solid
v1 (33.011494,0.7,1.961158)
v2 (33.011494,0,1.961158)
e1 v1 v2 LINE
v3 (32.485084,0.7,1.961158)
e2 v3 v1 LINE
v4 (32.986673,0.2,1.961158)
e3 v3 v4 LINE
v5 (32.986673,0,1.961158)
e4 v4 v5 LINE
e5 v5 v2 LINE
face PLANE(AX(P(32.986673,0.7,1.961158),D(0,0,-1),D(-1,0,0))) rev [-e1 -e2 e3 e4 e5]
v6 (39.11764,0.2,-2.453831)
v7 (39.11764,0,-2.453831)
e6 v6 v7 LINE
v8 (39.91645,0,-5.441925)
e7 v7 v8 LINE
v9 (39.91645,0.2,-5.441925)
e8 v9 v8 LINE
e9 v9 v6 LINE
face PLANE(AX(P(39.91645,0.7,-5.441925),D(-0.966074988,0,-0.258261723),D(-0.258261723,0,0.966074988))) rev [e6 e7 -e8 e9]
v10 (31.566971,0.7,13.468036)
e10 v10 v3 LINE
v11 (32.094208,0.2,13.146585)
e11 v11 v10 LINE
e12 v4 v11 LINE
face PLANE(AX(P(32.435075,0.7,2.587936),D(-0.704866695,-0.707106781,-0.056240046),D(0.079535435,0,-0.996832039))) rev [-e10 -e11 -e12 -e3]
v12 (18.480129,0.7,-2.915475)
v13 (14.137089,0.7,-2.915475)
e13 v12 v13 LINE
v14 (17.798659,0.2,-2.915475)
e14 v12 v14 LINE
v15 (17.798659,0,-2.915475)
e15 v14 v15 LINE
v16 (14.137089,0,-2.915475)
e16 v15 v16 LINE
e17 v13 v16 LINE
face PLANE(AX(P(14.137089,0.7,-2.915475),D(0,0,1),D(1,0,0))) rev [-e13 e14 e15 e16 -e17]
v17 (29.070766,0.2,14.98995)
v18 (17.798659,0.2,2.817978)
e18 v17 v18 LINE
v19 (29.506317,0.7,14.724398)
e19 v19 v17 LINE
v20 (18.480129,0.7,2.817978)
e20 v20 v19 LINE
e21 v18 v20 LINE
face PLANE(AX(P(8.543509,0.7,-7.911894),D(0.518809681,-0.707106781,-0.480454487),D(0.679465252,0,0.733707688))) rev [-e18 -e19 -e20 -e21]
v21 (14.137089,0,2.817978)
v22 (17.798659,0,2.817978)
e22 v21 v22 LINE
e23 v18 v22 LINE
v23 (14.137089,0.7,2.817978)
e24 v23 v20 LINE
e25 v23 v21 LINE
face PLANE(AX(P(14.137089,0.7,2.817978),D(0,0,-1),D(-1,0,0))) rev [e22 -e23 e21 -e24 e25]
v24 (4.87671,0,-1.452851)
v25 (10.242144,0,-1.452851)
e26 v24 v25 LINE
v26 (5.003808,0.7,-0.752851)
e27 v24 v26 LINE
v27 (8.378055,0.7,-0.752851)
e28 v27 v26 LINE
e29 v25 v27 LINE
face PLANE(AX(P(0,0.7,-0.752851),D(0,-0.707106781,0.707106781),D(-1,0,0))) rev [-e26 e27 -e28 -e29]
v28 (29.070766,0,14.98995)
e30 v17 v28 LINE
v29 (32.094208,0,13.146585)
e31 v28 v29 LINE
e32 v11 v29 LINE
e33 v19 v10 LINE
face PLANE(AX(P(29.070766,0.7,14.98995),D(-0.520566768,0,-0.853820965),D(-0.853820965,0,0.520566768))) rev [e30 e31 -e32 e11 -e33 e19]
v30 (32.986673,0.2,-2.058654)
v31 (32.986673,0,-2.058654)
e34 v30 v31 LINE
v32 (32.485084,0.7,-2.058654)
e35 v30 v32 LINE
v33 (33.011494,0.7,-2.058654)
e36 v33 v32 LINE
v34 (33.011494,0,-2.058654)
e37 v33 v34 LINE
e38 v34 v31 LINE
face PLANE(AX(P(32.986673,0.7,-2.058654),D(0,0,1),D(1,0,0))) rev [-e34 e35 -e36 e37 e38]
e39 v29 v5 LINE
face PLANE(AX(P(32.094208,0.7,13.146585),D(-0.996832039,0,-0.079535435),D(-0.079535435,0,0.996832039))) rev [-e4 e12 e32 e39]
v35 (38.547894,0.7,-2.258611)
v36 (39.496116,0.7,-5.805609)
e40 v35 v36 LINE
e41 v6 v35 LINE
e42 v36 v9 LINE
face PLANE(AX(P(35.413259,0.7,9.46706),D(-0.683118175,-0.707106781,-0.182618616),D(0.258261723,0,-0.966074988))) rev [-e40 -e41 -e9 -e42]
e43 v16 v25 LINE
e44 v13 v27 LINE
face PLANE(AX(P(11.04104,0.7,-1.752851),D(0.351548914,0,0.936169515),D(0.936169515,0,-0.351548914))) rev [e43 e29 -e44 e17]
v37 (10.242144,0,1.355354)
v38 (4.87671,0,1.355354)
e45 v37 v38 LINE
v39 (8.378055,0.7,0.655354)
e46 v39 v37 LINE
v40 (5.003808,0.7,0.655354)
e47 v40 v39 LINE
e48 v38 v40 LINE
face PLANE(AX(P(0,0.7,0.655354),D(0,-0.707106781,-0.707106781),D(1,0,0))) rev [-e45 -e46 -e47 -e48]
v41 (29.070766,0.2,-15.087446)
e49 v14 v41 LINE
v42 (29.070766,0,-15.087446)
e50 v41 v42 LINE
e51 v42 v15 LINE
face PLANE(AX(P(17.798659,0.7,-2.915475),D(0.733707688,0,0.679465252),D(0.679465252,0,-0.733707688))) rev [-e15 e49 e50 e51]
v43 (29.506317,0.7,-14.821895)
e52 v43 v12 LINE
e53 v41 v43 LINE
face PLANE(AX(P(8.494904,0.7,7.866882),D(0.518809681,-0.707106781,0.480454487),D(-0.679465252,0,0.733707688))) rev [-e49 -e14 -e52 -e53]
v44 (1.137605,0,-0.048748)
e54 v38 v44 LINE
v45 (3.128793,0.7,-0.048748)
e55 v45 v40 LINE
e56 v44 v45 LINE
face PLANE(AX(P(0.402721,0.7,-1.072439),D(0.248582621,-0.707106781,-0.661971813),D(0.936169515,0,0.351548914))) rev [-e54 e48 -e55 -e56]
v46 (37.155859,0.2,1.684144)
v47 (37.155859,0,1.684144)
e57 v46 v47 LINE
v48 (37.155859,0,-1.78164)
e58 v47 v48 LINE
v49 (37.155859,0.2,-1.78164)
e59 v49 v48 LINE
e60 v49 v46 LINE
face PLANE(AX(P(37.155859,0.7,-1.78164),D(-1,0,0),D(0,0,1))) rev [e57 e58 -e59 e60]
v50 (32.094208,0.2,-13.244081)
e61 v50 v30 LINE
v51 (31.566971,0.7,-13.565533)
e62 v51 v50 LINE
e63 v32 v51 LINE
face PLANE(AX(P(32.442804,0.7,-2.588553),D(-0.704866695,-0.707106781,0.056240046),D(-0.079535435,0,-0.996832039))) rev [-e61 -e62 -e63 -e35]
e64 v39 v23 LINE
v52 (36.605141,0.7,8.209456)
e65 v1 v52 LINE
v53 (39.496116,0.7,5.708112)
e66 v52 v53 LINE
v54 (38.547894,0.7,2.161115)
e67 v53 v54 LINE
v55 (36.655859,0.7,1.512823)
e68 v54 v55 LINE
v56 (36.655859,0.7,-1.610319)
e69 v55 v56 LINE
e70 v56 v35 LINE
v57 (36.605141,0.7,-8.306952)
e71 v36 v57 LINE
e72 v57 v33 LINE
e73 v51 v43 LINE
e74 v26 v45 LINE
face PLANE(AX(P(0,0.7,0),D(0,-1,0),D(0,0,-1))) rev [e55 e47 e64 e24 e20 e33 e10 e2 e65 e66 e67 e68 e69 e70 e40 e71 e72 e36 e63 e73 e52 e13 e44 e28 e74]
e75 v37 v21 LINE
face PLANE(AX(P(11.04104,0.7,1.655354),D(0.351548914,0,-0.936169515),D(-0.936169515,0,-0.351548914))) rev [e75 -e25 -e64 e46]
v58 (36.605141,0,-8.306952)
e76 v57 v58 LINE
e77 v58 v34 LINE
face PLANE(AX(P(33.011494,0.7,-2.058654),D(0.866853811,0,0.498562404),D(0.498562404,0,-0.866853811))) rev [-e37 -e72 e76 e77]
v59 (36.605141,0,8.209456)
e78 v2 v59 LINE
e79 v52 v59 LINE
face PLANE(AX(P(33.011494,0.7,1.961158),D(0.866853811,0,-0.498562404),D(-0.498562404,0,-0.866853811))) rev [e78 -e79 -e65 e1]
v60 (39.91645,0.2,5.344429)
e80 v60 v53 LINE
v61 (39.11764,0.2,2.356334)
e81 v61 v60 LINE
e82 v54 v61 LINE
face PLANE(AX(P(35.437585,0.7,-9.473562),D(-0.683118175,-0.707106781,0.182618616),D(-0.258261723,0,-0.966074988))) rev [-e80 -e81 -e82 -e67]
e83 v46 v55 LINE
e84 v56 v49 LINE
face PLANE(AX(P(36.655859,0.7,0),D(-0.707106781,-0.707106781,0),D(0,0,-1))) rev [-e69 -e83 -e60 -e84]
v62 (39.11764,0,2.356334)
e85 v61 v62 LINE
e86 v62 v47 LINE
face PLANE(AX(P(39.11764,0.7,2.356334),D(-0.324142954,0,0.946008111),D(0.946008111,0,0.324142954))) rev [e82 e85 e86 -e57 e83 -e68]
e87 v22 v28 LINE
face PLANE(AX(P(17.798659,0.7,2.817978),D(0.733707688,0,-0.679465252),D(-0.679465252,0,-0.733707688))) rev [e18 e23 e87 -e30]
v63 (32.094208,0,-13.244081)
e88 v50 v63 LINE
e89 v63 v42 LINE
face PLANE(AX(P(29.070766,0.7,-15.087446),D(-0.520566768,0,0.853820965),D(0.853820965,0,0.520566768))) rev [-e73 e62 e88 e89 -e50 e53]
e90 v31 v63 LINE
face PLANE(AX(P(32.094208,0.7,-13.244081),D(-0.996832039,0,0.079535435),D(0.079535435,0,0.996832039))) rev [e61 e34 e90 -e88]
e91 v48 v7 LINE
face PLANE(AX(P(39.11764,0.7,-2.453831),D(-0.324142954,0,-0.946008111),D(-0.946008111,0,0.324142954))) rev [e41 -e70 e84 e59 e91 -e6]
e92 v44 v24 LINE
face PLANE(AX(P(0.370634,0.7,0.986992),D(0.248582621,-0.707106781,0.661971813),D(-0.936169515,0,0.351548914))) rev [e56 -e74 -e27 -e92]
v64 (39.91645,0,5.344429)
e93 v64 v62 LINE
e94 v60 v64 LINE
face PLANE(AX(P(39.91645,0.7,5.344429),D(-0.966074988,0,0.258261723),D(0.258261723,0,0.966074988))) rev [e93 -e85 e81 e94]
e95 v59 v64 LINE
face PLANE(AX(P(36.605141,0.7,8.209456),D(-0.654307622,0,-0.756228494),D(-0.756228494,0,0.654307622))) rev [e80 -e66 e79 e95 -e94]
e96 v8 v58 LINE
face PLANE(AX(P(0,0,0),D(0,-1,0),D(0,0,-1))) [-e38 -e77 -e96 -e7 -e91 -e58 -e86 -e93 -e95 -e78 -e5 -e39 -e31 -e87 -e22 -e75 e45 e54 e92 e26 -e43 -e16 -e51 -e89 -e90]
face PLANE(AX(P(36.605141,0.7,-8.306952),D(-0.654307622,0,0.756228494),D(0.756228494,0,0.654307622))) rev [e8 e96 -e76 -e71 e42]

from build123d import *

# Parameters (mm, degrees)
BOSS_EXTRUDE1_DEPTH = 0.7
CHAMFER1_SIZE       = 1
CHAMFER2_SIZE       = 0.5


with BuildPart() as part:
    # Sketch1 → Boss-Extrude1 (new body)
    with BuildSketch(Plane(origin=(0, 0, 0), x_dir=(1, 0, 0), z_dir=(0, 1, 0))):
        Polygon((0.284238857, 0.048748246), (4.822239021, 1.752850979), (11.041039678, 1.752850979), (14.137088798, 2.915474508), (17.798659013, 2.915474508), (29.070766186, 15.087446012), (32.094208001, 13.244081421), (32.986673125, 2.05865414), (33.011493829, 2.05865414), (36.605140674, 8.306952125), (39.91645027, 5.441925055), (39.11764025, 2.453830764), (37.15585938, 1.781640495), (37.15585938, -1.684144002), (39.11764025, -2.356334271), (39.91645027, -5.344428562), (36.605140674, -8.209455633), (33.011493829, -1.961157647), (32.986673125, -1.961157647), (32.094208001, -13.146584929), (29.070766186, -14.98994952), (17.798659013, -2.817978016), (14.137088798, -2.817978016), (11.041039678, -1.655354487), (4.822239021, -1.655354487), align=None)
    extrude(amount=BOSS_EXTRUDE1_DEPTH)

    # Chamfer1
    # the kernel refuses this chamfer: 1 mm, written as the material it takes off along each edge
    with BuildSketch(Plane(origin=(2.250556033, 0.7, -1.752850979), x_dir=(0, -0.9996219169112968, -0.02749587661058627), z_dir=(1, 0, 0))) as chamfer1_piece_1_section:
        Polygon((CHAMFER1_SIZE * 0.999621916911, -CHAMFER1_SIZE * 0.0274958766106), (-CHAMFER1_SIZE * 0.0274958766106, -CHAMFER1_SIZE * 0.999621916911), (0, 0), align=None)
    chamfer1_piece_1 = extrude(amount=11.362166633, mode=Mode.PRIVATE)
    chamfer1_piece_1 = split(chamfer1_piece_1, bisect_by=Plane(origin=(6.727578787, 0.358780421, -0.133066883), z_dir=(-0.3515489139570331, 0, -0.9361695151497034)), keep=Keep.TOP, mode=Mode.PRIVATE)
    add(chamfer1_piece_1, mode=Mode.SUBTRACT)
    with BuildSketch(Plane(origin=(-2.123292359, 0.7, 0.855324115), x_dir=(-0.00966614556074823, -0.9996219169112968, -0.025740801475148727), z_dir=(0.9361695151497034, 0, -0.351548913957033)), Plane(origin=(7.229770237, 0.7, 2.559426848), x_dir=(-0.00966614556074825, -0.9996219169112968, 0.025740801475148775), z_dir=(-0.9361695151497034, 0, -0.351548913957033))) as chamfer1_piece_2:
        Polygon((CHAMFER1_SIZE * 0.999621916911, -CHAMFER1_SIZE * 0.0274958766106), (-CHAMFER1_SIZE * 0.0274958766106, -CHAMFER1_SIZE * 0.999621916911), (0, 0), align=None)
    extrude(amount=9.990778854, mode=Mode.SUBTRACT)
    with BuildSketch(Plane(origin=(13.612722666, 0.7, 1.655354487), x_dir=(0, -0.9996219169112968, 0.02749587661058627), z_dir=(-1, 0, 0))) as chamfer1_piece_3_section:
        Polygon((CHAMFER1_SIZE * 0.999621916911, -CHAMFER1_SIZE * 0.0274958766106), (-CHAMFER1_SIZE * 0.0274958766106, -CHAMFER1_SIZE * 0.999621916911), (0, 0), align=None)
    chamfer1_piece_3 = extrude(amount=11.362166633, mode=Mode.PRIVATE)
    chamfer1_piece_3 = split(chamfer1_piece_3, bisect_by=Plane(origin=(6.727578787, 0.358780421, 0.035570391), z_dir=(-0.3515489139570331, 0, 0.9361695151497034)), keep=Keep.TOP, mode=Mode.PRIVATE)
    add(chamfer1_piece_3, mode=Mode.SUBTRACT)

    # Chamfer2
    chamfer2_edges = [part.edges().sort_by_distance(p)[0] for p in [
        (23.4347126, 0.7, 8.903963768),
        (32.540440563, 0.7, 7.553871288),
        (39.51704526, 0.7, 3.850381417),
        (37.15585938, 0.7, -0.048748246),
        (39.51704526, 0.7, -3.947877909),
        (32.540440563, 0.7, -7.65136778),
        (23.4347126, 0.7, -9.00146026),
    ]]
    chamfer(chamfer2_edges, length=CHAMFER2_SIZE)


solid = part.part
